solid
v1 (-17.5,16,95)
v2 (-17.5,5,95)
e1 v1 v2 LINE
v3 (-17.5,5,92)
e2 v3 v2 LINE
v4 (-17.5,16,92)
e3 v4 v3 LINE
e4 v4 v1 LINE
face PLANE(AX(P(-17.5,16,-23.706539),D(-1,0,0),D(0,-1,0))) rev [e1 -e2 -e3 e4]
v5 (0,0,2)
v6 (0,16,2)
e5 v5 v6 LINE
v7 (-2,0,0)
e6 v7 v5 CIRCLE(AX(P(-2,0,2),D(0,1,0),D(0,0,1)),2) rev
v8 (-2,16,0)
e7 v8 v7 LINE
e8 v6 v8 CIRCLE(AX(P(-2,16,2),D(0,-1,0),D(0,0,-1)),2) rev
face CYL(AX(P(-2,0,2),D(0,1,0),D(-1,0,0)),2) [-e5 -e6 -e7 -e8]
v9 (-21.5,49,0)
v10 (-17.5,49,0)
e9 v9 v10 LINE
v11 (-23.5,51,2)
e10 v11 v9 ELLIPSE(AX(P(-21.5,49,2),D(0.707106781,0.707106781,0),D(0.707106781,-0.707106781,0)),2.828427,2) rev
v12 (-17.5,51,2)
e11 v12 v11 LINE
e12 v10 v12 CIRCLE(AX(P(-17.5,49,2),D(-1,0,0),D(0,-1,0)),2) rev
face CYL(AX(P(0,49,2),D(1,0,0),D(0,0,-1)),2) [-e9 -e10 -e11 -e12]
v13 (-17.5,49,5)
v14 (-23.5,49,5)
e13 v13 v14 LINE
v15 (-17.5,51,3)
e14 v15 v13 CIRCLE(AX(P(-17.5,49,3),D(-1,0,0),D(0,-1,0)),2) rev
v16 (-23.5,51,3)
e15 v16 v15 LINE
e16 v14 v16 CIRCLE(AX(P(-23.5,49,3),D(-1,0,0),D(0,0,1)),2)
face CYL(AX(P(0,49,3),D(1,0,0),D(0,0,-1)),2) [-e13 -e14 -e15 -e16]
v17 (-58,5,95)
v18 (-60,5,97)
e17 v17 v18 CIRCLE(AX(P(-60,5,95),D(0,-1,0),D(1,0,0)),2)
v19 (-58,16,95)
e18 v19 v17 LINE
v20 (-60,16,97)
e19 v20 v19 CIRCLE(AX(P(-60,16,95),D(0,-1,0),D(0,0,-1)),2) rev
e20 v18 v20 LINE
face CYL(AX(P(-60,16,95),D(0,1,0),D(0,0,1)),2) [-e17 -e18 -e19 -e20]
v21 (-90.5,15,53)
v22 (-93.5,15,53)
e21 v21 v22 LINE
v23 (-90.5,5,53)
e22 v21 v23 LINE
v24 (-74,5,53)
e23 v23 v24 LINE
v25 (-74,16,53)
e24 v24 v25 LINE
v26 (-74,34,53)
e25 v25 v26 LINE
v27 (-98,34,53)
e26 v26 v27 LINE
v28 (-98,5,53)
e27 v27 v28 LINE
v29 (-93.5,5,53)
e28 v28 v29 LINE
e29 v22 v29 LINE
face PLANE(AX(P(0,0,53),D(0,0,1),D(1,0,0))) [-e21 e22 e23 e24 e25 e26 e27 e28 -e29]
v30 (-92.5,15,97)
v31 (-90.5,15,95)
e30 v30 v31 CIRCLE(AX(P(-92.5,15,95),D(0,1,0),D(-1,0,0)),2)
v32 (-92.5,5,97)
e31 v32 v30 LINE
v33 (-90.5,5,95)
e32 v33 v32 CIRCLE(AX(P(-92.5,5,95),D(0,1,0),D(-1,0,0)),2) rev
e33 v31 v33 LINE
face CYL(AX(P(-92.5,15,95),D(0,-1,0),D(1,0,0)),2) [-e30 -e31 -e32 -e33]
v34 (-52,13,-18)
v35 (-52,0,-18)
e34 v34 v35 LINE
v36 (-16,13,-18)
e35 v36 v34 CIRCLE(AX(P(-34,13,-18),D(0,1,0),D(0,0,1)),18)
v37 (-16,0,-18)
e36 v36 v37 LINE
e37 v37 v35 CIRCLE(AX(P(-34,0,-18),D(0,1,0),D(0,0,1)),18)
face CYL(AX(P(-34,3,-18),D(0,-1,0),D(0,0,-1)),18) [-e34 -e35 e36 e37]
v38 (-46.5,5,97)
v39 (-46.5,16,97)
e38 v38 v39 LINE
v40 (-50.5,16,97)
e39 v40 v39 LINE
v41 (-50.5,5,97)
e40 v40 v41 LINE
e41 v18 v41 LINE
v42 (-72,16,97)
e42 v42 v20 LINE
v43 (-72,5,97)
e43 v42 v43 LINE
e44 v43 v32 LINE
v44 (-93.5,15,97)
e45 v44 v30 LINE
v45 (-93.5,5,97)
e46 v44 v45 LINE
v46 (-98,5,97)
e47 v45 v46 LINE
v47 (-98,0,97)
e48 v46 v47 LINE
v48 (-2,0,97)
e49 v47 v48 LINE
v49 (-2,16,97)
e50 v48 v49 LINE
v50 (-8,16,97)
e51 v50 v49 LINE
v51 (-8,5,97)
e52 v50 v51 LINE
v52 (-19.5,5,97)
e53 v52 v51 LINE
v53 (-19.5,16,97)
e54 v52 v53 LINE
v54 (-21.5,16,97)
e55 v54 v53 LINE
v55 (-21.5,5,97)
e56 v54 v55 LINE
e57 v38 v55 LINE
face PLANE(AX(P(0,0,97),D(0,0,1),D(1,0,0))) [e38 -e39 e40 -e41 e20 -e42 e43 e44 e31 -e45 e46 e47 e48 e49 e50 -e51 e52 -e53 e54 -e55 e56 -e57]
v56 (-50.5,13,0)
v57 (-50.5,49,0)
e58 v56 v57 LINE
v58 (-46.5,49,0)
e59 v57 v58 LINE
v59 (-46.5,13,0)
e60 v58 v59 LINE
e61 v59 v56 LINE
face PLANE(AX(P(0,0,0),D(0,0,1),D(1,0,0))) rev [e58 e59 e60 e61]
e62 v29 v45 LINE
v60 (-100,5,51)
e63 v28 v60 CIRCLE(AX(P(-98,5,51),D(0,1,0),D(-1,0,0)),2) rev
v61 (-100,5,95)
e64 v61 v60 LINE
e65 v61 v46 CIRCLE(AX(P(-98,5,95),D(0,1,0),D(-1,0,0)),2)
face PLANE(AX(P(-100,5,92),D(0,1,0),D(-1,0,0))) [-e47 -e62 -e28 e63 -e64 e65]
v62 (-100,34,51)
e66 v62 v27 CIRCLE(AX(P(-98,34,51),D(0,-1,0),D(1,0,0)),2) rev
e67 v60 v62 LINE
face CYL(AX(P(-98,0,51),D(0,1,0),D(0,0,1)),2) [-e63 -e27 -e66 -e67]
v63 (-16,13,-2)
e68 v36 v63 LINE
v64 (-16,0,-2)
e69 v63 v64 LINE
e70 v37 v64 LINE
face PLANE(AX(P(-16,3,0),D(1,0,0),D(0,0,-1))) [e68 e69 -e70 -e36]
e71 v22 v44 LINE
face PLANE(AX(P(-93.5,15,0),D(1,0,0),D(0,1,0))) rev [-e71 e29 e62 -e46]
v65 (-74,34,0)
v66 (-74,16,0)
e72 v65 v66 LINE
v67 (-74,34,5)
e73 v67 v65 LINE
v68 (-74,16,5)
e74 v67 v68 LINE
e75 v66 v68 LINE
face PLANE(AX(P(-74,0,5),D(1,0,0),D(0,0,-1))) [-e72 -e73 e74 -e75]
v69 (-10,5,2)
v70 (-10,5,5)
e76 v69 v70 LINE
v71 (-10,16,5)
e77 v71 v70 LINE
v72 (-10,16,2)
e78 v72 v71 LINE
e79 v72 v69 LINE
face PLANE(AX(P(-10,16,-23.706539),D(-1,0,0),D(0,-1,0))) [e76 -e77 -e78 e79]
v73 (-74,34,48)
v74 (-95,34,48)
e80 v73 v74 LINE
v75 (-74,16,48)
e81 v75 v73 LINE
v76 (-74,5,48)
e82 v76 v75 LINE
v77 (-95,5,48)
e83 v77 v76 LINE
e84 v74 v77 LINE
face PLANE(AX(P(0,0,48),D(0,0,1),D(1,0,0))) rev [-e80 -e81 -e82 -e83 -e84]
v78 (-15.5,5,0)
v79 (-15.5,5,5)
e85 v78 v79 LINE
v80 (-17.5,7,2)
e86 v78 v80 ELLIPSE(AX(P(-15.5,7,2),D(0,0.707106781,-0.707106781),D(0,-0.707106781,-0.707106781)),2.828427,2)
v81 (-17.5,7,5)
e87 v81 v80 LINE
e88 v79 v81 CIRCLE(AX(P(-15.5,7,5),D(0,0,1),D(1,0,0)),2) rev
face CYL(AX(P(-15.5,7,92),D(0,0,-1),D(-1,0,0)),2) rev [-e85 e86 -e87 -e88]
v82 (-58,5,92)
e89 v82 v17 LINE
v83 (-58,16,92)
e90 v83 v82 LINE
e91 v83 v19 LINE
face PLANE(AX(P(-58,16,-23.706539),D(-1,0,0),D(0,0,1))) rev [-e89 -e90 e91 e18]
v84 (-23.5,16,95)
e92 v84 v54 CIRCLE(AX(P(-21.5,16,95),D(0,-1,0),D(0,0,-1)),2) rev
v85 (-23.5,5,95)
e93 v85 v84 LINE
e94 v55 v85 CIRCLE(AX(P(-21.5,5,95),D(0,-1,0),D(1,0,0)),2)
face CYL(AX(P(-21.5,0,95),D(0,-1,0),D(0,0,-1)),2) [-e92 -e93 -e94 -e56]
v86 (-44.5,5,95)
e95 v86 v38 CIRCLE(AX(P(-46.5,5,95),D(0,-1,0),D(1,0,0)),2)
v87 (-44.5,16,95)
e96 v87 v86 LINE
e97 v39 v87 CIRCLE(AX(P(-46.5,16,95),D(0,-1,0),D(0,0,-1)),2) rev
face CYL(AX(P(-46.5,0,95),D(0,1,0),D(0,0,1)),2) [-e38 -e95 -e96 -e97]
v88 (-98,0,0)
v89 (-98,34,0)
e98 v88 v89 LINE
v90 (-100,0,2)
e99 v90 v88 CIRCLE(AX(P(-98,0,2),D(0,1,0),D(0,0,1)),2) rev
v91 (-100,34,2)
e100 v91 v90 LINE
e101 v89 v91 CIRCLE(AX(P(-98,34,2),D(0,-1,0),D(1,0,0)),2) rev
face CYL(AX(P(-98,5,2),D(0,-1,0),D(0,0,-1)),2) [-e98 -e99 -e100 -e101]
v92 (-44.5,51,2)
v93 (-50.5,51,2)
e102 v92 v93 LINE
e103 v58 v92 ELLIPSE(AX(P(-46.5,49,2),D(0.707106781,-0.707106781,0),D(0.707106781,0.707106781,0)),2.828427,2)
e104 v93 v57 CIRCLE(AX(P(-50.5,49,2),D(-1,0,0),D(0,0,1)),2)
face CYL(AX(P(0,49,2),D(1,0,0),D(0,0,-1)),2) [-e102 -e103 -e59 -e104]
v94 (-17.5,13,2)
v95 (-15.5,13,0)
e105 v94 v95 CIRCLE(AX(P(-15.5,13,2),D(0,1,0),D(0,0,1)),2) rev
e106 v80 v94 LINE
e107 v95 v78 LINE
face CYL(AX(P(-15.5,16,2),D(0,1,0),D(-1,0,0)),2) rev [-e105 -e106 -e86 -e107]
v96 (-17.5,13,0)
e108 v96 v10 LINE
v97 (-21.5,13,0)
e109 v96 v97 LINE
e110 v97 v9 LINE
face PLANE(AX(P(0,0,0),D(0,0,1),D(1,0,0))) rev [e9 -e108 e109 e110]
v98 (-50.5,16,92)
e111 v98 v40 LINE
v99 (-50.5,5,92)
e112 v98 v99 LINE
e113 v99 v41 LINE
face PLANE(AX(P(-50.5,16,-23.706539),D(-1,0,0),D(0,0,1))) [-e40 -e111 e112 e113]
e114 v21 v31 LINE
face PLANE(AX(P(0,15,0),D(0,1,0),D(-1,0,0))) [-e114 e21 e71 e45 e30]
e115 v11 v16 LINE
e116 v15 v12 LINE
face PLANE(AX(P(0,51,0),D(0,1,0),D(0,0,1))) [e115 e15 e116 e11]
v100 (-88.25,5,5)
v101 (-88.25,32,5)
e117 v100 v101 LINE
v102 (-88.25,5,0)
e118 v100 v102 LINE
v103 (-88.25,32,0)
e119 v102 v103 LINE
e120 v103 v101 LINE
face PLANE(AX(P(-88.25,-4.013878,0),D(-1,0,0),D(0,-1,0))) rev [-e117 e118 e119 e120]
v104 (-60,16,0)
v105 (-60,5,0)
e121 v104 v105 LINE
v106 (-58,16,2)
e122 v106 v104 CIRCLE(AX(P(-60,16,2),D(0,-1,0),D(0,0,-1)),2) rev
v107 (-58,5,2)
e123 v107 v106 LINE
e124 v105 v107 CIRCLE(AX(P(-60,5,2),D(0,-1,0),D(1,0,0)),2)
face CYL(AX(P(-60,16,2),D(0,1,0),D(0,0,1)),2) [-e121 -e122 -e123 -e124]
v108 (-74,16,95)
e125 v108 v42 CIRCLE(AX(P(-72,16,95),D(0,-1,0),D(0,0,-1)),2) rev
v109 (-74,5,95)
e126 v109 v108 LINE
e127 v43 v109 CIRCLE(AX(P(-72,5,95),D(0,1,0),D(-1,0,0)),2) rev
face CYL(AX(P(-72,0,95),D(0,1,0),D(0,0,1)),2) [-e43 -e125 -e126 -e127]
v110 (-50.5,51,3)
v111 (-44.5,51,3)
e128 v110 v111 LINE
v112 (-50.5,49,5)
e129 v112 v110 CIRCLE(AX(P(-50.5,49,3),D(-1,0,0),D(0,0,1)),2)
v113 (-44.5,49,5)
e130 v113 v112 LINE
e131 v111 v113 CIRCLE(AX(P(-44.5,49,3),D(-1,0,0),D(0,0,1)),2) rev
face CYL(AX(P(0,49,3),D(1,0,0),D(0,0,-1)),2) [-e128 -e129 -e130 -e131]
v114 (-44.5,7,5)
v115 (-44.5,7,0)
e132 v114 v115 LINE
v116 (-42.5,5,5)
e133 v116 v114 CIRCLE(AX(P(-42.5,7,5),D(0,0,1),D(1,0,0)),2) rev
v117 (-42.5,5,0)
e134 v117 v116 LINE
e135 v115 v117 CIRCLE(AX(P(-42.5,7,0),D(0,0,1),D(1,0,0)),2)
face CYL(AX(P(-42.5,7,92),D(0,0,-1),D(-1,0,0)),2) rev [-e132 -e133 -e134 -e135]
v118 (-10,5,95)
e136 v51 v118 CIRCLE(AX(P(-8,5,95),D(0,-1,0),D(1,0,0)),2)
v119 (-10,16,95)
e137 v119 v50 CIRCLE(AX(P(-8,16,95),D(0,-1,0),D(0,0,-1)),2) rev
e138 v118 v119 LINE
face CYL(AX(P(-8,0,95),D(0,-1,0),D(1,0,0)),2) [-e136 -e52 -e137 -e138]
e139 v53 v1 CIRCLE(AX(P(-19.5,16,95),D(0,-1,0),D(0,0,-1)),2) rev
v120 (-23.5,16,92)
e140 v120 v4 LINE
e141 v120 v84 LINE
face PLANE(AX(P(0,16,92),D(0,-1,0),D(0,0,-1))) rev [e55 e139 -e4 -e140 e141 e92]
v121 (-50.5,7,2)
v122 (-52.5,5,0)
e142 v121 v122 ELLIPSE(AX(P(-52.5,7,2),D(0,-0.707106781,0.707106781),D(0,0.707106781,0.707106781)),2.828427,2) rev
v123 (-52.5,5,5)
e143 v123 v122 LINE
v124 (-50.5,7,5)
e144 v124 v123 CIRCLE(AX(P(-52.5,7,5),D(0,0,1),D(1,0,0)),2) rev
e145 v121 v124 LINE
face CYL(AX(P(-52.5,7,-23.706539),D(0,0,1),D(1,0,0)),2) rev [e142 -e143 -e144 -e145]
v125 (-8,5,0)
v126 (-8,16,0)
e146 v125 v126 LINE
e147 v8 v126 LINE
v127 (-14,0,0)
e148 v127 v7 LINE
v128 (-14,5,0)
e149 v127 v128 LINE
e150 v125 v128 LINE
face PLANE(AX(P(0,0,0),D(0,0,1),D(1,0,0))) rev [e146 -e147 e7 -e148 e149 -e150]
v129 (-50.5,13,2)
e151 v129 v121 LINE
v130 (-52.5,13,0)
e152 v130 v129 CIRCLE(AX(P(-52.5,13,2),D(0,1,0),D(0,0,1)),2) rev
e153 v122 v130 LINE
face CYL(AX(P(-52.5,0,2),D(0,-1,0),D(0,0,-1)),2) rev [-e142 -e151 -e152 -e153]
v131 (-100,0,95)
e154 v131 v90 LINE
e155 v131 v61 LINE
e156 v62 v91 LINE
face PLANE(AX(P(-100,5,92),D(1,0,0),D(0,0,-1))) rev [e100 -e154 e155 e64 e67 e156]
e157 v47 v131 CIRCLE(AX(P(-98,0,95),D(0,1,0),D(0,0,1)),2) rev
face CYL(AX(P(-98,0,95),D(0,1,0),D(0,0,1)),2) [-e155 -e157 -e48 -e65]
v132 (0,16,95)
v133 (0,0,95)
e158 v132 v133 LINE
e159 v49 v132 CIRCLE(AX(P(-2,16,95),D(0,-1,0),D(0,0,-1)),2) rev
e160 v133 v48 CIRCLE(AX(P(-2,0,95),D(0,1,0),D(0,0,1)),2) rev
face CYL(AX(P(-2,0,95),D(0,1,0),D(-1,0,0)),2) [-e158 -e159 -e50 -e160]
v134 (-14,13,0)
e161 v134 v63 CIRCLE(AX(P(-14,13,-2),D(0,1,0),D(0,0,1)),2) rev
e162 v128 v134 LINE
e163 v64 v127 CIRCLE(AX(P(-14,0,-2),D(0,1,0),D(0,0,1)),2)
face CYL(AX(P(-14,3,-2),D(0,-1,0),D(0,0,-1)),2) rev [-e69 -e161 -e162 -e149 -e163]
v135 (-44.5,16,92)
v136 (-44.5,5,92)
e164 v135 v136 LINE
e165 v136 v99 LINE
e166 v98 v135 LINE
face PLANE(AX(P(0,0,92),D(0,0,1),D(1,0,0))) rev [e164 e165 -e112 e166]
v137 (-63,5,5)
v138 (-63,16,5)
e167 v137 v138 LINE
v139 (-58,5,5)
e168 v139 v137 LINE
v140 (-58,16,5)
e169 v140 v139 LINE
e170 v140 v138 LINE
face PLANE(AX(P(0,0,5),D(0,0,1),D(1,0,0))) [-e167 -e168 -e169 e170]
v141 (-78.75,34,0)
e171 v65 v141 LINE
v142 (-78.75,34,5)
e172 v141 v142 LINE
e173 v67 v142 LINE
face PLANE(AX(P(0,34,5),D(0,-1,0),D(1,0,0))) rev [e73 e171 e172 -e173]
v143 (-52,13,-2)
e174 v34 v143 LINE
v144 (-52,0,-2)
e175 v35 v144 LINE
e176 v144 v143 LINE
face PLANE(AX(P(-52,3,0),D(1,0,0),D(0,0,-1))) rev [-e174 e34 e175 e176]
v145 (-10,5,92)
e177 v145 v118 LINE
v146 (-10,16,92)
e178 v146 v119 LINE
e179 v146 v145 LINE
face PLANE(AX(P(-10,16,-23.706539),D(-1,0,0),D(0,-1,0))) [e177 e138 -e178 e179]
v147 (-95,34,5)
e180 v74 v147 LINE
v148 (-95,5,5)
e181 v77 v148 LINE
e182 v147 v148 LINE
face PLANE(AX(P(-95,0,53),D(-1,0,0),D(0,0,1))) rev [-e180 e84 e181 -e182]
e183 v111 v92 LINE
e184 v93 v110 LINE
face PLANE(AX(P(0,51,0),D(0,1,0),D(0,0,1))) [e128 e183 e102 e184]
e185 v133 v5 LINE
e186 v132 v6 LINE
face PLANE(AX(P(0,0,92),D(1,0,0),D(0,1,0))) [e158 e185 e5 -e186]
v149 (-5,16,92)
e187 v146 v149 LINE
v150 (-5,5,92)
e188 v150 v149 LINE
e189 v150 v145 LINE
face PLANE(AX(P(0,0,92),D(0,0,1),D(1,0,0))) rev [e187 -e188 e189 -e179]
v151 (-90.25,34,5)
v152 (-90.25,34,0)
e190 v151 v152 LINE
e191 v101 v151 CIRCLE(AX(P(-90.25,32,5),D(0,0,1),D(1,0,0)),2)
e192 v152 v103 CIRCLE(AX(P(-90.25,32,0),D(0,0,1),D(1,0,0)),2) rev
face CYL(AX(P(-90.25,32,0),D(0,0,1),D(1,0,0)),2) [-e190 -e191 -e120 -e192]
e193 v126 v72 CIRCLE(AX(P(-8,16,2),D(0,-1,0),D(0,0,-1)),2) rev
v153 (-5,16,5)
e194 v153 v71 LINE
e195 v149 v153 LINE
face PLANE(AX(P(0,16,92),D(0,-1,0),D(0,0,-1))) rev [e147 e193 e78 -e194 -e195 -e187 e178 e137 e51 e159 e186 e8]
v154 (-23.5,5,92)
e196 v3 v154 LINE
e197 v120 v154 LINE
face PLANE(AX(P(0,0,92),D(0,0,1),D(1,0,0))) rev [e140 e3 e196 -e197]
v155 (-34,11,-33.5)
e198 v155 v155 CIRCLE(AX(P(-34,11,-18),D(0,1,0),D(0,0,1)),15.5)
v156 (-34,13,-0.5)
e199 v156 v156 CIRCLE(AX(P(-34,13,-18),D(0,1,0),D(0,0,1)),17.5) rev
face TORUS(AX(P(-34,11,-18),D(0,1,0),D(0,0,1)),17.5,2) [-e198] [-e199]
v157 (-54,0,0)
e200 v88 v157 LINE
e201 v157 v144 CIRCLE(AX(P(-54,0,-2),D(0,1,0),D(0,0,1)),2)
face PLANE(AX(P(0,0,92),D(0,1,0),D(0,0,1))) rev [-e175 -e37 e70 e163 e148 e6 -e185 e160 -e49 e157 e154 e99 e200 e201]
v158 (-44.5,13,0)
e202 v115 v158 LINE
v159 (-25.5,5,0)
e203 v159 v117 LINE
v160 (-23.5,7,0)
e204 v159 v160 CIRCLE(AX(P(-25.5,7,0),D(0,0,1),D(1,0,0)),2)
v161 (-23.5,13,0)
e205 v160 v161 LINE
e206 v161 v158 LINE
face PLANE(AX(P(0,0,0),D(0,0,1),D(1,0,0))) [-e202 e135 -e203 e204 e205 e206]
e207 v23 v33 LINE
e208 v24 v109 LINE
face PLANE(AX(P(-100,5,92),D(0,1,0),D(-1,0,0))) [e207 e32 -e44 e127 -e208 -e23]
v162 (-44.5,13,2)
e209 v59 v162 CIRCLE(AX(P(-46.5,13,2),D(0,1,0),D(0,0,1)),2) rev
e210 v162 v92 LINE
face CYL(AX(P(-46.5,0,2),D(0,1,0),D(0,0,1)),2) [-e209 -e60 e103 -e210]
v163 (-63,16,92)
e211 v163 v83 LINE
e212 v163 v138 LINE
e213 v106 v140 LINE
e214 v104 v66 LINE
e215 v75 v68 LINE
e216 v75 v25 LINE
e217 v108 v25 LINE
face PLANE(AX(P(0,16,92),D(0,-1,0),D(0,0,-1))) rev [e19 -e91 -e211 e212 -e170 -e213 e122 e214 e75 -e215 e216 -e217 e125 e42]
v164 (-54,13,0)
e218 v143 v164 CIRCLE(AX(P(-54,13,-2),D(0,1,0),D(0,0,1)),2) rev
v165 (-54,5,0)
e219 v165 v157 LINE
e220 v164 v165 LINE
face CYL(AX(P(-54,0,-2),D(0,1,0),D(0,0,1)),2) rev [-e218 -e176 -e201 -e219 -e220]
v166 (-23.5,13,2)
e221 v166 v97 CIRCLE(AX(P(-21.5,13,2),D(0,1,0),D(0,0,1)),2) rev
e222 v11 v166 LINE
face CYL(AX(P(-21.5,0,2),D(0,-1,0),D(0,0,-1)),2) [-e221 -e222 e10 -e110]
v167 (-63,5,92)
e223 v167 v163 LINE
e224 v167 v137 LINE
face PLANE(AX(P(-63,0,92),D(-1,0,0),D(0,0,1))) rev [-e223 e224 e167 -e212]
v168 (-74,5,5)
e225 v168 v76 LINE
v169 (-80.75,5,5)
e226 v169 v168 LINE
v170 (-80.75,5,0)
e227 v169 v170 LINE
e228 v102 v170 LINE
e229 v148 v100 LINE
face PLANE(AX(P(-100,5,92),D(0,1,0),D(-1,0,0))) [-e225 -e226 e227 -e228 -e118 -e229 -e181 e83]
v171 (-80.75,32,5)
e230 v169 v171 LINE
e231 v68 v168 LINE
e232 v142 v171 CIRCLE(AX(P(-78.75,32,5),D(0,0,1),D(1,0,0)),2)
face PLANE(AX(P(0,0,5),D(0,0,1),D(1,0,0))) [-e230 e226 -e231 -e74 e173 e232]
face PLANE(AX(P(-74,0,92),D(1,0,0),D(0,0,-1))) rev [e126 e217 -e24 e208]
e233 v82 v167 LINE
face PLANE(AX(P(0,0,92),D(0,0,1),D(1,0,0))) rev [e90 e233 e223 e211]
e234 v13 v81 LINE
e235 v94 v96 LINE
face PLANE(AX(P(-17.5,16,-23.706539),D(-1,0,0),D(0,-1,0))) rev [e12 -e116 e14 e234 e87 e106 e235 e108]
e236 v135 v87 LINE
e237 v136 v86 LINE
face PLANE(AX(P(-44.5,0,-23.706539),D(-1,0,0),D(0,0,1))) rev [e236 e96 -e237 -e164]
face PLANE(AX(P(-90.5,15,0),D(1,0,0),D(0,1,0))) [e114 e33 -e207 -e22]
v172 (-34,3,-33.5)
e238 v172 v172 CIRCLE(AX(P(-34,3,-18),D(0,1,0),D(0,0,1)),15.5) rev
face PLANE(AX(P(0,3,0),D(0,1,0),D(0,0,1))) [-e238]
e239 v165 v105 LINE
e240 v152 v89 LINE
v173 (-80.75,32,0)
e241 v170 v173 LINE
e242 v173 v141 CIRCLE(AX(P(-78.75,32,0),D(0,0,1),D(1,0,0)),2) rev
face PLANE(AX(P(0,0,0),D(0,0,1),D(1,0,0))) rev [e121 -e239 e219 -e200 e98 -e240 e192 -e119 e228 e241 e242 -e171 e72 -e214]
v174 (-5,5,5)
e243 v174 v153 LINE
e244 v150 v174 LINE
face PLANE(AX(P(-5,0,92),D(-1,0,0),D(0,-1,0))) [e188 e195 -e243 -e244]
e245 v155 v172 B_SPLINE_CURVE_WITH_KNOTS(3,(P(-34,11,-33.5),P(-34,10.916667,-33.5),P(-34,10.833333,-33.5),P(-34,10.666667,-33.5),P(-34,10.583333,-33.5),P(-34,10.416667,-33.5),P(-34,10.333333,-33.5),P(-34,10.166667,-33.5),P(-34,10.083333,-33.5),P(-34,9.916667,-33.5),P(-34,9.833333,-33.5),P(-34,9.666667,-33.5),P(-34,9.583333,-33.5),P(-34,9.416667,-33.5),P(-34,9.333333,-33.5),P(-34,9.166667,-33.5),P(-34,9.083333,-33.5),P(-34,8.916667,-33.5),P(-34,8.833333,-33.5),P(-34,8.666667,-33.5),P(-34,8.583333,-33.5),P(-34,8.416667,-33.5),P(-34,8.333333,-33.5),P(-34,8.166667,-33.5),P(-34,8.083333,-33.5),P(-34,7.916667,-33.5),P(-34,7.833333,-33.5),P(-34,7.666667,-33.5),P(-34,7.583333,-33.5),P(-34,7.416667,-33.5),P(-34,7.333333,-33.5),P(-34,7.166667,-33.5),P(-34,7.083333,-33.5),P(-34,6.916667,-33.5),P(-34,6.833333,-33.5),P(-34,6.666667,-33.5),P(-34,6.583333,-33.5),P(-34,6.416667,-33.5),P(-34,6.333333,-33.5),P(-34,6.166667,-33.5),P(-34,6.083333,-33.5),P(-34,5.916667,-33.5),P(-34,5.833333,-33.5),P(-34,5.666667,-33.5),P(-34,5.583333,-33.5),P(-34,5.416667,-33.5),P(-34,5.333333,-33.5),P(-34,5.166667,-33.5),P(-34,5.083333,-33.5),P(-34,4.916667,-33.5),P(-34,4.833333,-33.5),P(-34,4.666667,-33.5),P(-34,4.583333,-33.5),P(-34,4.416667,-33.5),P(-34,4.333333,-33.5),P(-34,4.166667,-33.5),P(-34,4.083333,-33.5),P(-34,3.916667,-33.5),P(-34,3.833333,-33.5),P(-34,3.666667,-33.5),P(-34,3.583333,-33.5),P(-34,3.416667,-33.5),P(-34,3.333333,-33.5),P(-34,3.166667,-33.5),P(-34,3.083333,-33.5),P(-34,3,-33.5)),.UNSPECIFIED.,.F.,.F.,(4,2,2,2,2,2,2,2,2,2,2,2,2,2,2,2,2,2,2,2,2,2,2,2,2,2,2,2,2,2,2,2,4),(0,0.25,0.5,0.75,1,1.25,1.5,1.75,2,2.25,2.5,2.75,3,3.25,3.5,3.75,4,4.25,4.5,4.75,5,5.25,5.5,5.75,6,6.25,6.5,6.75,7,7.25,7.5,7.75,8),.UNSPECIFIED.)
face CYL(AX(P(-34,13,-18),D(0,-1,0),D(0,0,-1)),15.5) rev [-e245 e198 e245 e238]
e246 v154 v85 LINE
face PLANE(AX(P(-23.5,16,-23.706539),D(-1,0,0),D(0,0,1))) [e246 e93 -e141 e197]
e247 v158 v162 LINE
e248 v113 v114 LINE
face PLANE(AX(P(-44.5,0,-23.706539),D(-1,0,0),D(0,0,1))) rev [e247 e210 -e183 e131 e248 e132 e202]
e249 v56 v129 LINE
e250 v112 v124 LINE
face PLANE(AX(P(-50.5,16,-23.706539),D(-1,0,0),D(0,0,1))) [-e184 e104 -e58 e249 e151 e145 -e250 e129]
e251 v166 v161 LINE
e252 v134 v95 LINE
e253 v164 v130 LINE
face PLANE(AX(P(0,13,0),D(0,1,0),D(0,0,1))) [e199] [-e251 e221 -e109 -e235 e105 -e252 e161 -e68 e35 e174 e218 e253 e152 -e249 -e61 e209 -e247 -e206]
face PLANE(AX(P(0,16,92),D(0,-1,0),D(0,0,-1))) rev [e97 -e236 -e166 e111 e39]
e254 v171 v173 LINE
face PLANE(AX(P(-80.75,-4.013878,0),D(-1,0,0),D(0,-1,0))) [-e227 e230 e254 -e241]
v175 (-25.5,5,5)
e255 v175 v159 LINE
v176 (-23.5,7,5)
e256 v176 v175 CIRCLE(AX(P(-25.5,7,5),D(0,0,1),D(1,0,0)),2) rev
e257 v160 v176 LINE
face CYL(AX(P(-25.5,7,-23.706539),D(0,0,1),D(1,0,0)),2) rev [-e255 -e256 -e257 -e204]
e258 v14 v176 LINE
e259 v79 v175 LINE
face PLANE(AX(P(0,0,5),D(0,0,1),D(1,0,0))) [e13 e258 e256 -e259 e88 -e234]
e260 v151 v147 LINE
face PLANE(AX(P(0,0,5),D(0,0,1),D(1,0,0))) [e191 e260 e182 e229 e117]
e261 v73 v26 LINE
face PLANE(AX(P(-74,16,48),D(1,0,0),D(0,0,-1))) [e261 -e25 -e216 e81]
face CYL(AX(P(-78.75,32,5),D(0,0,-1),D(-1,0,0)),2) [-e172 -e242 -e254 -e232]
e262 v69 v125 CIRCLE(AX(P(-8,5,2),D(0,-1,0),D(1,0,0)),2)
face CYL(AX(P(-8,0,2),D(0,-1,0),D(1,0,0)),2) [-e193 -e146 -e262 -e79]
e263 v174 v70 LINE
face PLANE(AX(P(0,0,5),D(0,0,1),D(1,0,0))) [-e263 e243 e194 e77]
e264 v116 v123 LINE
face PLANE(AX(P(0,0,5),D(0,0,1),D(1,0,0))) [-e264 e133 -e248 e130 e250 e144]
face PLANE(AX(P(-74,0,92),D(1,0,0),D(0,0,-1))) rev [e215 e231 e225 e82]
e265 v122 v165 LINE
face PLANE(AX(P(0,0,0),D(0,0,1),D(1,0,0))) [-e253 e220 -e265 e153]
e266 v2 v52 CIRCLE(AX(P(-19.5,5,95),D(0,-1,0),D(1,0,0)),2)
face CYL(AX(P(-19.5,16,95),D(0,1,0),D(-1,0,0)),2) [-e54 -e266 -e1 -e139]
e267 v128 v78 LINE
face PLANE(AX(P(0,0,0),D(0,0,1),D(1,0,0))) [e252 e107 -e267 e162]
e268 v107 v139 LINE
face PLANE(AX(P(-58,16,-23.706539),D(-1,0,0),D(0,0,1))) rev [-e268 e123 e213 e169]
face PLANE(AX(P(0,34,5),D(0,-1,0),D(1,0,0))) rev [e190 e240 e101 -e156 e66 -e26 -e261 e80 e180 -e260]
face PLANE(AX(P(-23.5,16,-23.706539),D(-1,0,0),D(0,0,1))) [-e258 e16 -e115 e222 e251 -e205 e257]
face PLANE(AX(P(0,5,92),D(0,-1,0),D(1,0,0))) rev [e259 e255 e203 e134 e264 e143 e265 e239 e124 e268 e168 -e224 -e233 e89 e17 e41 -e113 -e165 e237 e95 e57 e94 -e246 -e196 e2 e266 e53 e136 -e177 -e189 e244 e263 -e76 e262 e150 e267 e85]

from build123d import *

# Parameters (mm, degrees)
BOSS_EXTRUDE1_DEPTH      = 92
SKETCH2_4_W              = 5
SKETCH2_4_H              = 29
SKETCH2_4_W_2            = 58
SKETCH2_4_H_2            = 11
BOSS_EXTRUDE2_DEPTH      = 5
SKETCH2_6_W              = 5
SKETCH2_6_H              = 29
BOSS_EXTRUDE3_DEPTH      = 53
BOSS_EXTRUDE4_DEPTH      = 5
SKETCH6_W                = 3.75
SKETCH6_H                = 5
CUT_EXTRUDE1_DEPTH       = 29
BOSS_EXTRUDE5_DEPTH      = 3
BOSS_EXTRUDE6_DEPTH      = 13
SKETCH9_W                = 58
SKETCH9_H                = 11
BOSS_EXTRUDE7_DEPTH      = 5
SKETCH13_W               = 3
SKETCH13_H               = 44
BOSS_EXTRUDE9_DEPTH      = 10
FILLET1_R                = 2
CUT_EXTRUDE2_START       = -97
CUT_EXTRUDE2_OUTLINE_W   = 7.5
CUT_EXTRUDE2_OUTLINE_H   = 11
CUT_EXTRUDE2_OUTLINE_W_2 = 21
CUT_EXTRUDE2_DEPTH       = 97
SKETCH11_W               = 6
SKETCH11_H               = 5
BOSS_EXTRUDE8_DEPTH      = 35
FILLET2_R                = 2


# Read off the part's stored shape, not the designer's step: Cut-Extrude2
with BuildPart() as part:
    # Sketch2 → Boss-Extrude1 (new body)
    with BuildSketch(Plane.XY):
        Polygon((0, 16), (-5, 16), (-5, 5), (-63, 5), (-63, 16), (-74, 16), (-74, 5), (-100, 5), (-100, 0), (0, 0), align=None)
    extrude(amount=BOSS_EXTRUDE1_DEPTH)

    # Sketch2<4> → Boss-Extrude2 (add)
    with BuildSketch(Plane.XY):
        Polygon((-74, 0), (-74, 5), (-95, 5), (-100, 5), (-100, 0), align=None)
        with Locations((-97.5, 19.5)):
            Rectangle(SKETCH2_4_W, SKETCH2_4_H)
        Polygon((-74, 5), (-74, 16), (-74, 34), (-95, 34), (-95, 5), align=None)
        with Locations((-34, 10.5)):
            Rectangle(SKETCH2_4_W_2, SKETCH2_4_H_2)
    extrude(amount=BOSS_EXTRUDE2_DEPTH)

    # Sketch2<6> → Boss-Extrude3 (add)
    with BuildSketch(Plane.XY):
        Polygon((-74, 0), (-74, 5), (-95, 5), (-100, 5), (-100, 0), align=None)
        with Locations((-97.5, 19.5)):
            Rectangle(SKETCH2_6_W, SKETCH2_6_H)
    extrude(amount=BOSS_EXTRUDE3_DEPTH)

    # Sketch3 → Boss-Extrude4 (add)
    with BuildSketch(Plane.XY.offset(53)):
        Polygon((-95, 34), (-95, 5), (-74, 5), (-74, 16), (-74, 34), align=None)
    extrude(amount=-BOSS_EXTRUDE4_DEPTH)

    # Sketch6 → Cut-Extrude1 (cut)
    with BuildSketch(Plane(origin=(0, 34, 0), x_dir=(1, 0, 0), z_dir=(0, 1, 0))):
        with Locations((-82.625, -2.5)):
            Rectangle(SKETCH6_W, SKETCH6_H)
        with Locations((-86.375, -2.5)):
            Rectangle(SKETCH6_W, SKETCH6_H)
    extrude(amount=-CUT_EXTRUDE1_DEPTH, mode=Mode.SUBTRACT)

    # Sketch7 → Boss-Extrude5 (add)
    with BuildSketch(Plane(origin=(0, 0, 0), x_dir=(1, 0, 0), z_dir=(0, 1, 0))):
        with BuildLine():
            ThreePointArc((-16, 18), (-21.272077939, 5.272077939), (-34, 0))
            Line((-34, 0), (-16, 0))
            Line((-16, 0), (-16, 18))
        make_face()
        with BuildLine():
            Line((-52, 0), (-34, 0))
            ThreePointArc((-34, 0), (-46.727922061, 5.272077939), (-52, 18))
            Line((-52, 18), (-52, 0))
        make_face()
        with BuildLine():
            ThreePointArc((-52, 18), (-46.727922061, 5.272077939), (-34, 0))
            Line((-34, 0), (-34, 2.5))
            ThreePointArc((-34, 2.5), (-49.5, 18), (-34, 33.5))
            Line((-34, 33.5), (-34, 36))
            ThreePointArc((-34, 36), (-46.727922061, 30.727922061), (-52, 18))
        make_face()
        with BuildLine():
            Line((-34, 2.5), (-34, 0))
            ThreePointArc((-34, 0), (-21.272077939, 5.272077939), (-16, 18))
            ThreePointArc((-16, 18), (-21.272077939, 30.727922061), (-34, 36))
            Line((-34, 36), (-34, 33.5))
            ThreePointArc((-34, 33.5), (-23.039844892, 28.960155108), (-18.5, 18))
            ThreePointArc((-18.5, 18), (-23.039844892, 7.039844892), (-34, 2.5))
        make_face()
        with BuildLine():
            ThreePointArc((-34, 33.5), (-49.5, 18), (-34, 2.5))
            Line((-34, 2.5), (-34, 33.5))
        make_face()
        with BuildLine():
            Line((-34, 33.5), (-34, 2.5))
            ThreePointArc((-34, 2.5), (-23.039844892, 7.039844892), (-18.5, 18))
            ThreePointArc((-18.5, 18), (-23.039844892, 28.960155108), (-34, 33.5))
        make_face()
    extrude(amount=BOSS_EXTRUDE5_DEPTH)

    # Sketch7<3> → Boss-Extrude6 (add)
    with BuildSketch(Plane(origin=(0, 0, 0), x_dir=(1, 0, 0), z_dir=(0, 1, 0))):
        with BuildLine():
            Line((-52, 0), (-34, 0))
            ThreePointArc((-34, 0), (-46.727922061, 5.272077939), (-52, 18))
            Line((-52, 18), (-52, 0))
        make_face()
        with BuildLine():
            ThreePointArc((-52, 18), (-46.727922061, 5.272077939), (-34, 0))
            Line((-34, 0), (-34, 2.5))
            ThreePointArc((-34, 2.5), (-49.5, 18), (-34, 33.5))
            Line((-34, 33.5), (-34, 36))
            ThreePointArc((-34, 36), (-46.727922061, 30.727922061), (-52, 18))
        make_face()
        with BuildLine():
            Line((-34, 2.5), (-34, 0))
            ThreePointArc((-34, 0), (-21.272077939, 5.272077939), (-16, 18))
            ThreePointArc((-16, 18), (-21.272077939, 30.727922061), (-34, 36))
            Line((-34, 36), (-34, 33.5))
            ThreePointArc((-34, 33.5), (-23.039844892, 28.960155108), (-18.5, 18))
            ThreePointArc((-18.5, 18), (-23.039844892, 7.039844892), (-34, 2.5))
        make_face()
        with BuildLine():
            ThreePointArc((-16, 18), (-21.272077939, 5.272077939), (-34, 0))
            Line((-34, 0), (-16, 0))
            Line((-16, 0), (-16, 18))
        make_face()
    extrude(amount=BOSS_EXTRUDE6_DEPTH)

    # Sketch9 → Boss-Extrude7 (add)
    with BuildSketch(Plane.XY.offset(92)):
        with Locations((-34, 10.5)):
            Rectangle(SKETCH9_W, SKETCH9_H)
        Polygon((-63, 16), (-74, 16), (-74, 5), (-100, 5), (-100, 0), (0, 0), (0, 16), (-5, 16), (-5, 5), (-63, 5), align=None)
    extrude(amount=BOSS_EXTRUDE7_DEPTH)

    # Sketch13 → Boss-Extrude9 (add)
    with BuildSketch(Plane(origin=(0, 5, 0), x_dir=(1, 0, 0), z_dir=(0, 1, 0))):
        with Locations((-92, -75)):
            Rectangle(SKETCH13_W, SKETCH13_H)
    extrude(amount=BOSS_EXTRUDE9_DEPTH)

    # Fillet1
    fillet1_edges = [part.edges().sort_by_distance(p)[0] for p in [
        (-100, 19.5, 53),
        (0, 8, 0),
        (-80.75, 34, 2.5),
        (-88.25, 34, 2.5),
        (-16, 6.5, 0),
        (-52, 6.5, 0),
        (-34, 13, -2.5),
        (-74, 10.5, 97),
        (-100, 2.5, 97),
        (0, 8, 97),
        (-100, 17, 0),
    ]]
    fillet(fillet1_edges, radius=FILLET1_R)

    # Cut-Extrude2 outline → Cut-Extrude2 (cut)
    with BuildSketch(Plane.XY.offset(97).offset(CUT_EXTRUDE2_START)):
        with Locations((-13.75, 10.5)):
            Rectangle(CUT_EXTRUDE2_OUTLINE_W, CUT_EXTRUDE2_OUTLINE_H)
        with Locations((-34, 10.5)):
            Rectangle(CUT_EXTRUDE2_OUTLINE_W_2, CUT_EXTRUDE2_OUTLINE_H)
        with Locations((-54.25, 10.5)):
            Rectangle(CUT_EXTRUDE2_OUTLINE_W, CUT_EXTRUDE2_OUTLINE_H)
    extrude(amount=CUT_EXTRUDE2_DEPTH, mode=Mode.SUBTRACT)

    # Sketch11 → Boss-Extrude8 (add)
    with BuildSketch(Plane(origin=(0, 16, 0), x_dir=(1, 0, 0), z_dir=(0, 1, 0))):
        with Locations((-20.5, -2.5)):
            Rectangle(SKETCH11_W, SKETCH11_H)
        with Locations((-47.5, -2.5)):
            Rectangle(SKETCH11_W, SKETCH11_H)
    extrude(amount=BOSS_EXTRUDE8_DEPTH)

    # Fillet2
    fillet2_edges = [part.edges().sort_by_distance(p)[0] for p in [
        (-90.5, 10, 97),
        (-10, 10.5, 97),
        (-17.5, 10.5, 97),
        (-10, 10.5, 0),
        (-17.5, 5, 2.5),
        (-17.5, 9, 0),
        (-58, 10.5, 0),
        (-58, 10.5, 97),
        (-50.5, 9, 0),
        (-50.5, 5, 2.5),
        (-44.5, 32, 0),
        (-23.5, 10.5, 97),
        (-23.5, 5, 2.5),
        (-44.5, 5, 2.5),
        (-44.5, 10.5, 97),
        (-23.5, 32, 0),
        (-20.5, 51, 0),
        (-20.5, 51, 5),
        (-47.5, 51, 0),
        (-47.5, 51, 5),
    ]]
    fillet(fillet2_edges, radius=FILLET2_R)


solid = part.part
